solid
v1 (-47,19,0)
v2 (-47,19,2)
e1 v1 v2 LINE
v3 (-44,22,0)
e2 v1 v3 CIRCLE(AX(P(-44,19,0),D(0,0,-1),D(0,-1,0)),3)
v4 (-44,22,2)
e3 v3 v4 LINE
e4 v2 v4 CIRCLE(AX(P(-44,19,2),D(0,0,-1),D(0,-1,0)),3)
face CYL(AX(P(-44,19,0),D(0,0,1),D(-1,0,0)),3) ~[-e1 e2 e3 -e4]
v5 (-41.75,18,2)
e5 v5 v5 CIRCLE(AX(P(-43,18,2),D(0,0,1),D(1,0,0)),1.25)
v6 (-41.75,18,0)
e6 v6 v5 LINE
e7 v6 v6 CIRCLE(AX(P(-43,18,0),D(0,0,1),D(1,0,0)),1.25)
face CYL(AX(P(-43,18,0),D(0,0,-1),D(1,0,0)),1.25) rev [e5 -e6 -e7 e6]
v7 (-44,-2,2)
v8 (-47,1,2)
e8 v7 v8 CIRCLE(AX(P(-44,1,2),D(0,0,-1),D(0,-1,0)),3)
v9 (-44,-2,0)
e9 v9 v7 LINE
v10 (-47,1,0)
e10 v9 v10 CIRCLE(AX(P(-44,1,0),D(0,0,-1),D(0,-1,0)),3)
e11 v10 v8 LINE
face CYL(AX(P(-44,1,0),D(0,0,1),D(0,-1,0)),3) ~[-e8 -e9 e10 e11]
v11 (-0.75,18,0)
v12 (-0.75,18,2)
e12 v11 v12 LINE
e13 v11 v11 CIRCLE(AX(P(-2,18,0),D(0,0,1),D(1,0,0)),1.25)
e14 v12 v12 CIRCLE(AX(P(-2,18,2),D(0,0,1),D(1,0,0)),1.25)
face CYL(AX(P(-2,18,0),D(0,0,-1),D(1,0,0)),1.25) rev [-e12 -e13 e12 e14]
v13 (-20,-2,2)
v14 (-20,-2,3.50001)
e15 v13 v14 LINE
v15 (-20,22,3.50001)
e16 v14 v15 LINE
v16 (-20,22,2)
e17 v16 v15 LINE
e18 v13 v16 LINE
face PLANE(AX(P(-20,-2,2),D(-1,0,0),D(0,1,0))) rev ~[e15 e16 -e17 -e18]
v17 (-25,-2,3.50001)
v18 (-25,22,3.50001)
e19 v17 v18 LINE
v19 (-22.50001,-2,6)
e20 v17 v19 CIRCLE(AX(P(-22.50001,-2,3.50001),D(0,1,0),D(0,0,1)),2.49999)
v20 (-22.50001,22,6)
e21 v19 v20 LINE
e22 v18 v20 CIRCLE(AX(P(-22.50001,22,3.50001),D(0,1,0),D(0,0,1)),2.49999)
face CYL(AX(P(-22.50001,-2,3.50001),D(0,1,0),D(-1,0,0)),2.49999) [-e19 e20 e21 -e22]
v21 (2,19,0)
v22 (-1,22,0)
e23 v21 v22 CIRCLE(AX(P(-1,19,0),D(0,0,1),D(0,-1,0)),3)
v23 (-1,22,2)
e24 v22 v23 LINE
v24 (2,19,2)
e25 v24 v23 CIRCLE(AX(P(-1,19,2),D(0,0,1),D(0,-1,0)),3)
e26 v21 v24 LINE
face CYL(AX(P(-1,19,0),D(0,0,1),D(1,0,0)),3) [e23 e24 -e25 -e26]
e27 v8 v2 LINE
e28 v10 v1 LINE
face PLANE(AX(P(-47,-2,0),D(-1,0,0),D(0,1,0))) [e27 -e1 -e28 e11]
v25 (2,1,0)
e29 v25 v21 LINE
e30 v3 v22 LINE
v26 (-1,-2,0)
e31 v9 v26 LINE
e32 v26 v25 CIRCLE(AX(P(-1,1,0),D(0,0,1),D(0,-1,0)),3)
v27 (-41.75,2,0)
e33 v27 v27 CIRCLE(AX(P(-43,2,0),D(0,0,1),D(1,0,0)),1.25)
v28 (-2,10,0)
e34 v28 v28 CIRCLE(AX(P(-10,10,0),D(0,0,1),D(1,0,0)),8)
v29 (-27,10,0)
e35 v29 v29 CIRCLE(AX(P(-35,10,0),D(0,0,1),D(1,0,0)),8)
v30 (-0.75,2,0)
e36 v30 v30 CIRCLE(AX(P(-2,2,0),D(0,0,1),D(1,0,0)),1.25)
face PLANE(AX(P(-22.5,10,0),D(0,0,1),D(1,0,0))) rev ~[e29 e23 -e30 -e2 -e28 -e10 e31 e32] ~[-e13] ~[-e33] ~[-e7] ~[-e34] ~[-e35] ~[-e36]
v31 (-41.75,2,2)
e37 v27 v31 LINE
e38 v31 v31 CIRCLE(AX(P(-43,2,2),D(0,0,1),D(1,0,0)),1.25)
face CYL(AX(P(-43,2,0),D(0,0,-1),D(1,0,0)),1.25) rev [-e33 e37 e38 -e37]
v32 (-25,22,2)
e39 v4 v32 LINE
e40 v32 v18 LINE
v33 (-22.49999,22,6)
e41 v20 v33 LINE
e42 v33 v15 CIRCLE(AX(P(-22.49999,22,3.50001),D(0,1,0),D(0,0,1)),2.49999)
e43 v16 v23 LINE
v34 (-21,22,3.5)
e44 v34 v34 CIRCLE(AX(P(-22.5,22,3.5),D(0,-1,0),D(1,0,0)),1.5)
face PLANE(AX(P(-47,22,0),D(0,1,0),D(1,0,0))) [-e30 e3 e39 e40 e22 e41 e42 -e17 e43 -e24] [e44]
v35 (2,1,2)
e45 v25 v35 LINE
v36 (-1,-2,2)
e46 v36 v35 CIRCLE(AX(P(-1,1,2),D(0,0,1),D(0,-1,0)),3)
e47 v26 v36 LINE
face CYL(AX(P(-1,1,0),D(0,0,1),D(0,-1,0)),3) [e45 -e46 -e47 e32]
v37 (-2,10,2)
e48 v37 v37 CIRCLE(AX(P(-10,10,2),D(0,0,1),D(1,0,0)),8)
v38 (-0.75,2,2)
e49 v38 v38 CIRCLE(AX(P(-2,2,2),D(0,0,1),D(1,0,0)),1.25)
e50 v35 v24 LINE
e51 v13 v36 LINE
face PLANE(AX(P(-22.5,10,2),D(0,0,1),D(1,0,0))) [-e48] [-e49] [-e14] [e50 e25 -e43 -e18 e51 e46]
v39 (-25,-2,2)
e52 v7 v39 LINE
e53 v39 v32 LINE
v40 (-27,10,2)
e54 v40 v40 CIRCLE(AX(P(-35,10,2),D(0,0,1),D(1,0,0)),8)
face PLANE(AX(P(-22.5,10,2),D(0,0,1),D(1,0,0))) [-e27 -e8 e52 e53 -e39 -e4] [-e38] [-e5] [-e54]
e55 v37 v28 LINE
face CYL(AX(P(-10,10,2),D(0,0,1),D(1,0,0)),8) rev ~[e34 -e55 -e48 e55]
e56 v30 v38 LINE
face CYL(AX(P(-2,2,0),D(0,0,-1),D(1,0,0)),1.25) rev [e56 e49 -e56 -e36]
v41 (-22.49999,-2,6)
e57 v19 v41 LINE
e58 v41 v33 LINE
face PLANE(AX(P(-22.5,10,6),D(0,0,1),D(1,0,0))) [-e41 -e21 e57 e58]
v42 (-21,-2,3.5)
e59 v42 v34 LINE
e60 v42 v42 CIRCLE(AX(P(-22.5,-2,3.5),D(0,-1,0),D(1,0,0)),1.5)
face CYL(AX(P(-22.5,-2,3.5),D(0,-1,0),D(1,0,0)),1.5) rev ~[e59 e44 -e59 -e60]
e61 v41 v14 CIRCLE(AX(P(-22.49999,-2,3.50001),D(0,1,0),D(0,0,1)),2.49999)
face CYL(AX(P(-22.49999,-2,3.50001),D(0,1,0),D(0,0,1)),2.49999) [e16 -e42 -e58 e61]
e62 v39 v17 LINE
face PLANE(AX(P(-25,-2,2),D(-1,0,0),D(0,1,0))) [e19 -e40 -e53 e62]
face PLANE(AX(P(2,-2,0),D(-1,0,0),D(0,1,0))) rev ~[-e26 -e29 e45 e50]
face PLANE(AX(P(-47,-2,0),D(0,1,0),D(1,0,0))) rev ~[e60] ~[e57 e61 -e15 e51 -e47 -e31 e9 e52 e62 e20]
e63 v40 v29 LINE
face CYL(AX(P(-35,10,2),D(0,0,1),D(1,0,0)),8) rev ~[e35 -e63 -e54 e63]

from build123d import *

# Parameters (mm, degrees)
F1_W      = 49
F1_H      = 24
F1_R      = 1.25
F2_DEPTH  = 2
F3_W      = 5
F3_H      = 24
F4_DEPTH  = 4
F5_R      = 1.5
F6_DEPTH  = 24
F7_R      = 2.49999
F8_R      = 3
F9_R      = 8
F10_DEPTH = 2


# Not quite as in the source:
# - a fillet or chamfer is up to 0.001 mm smaller than in the source, because OpenCascade refuses the exact size


with BuildPart() as f2:
    # F1 (on Top) → F2 (new body)
    with BuildSketch(Plane.XY):
        with Locations((-22.5, 10)):
            Rectangle(F1_W, F1_H)
        with Locations((-43, 2)):
            Circle(F1_R, mode=Mode.SUBTRACT)
        with Locations((-2, 2)):
            Circle(F1_R, mode=Mode.SUBTRACT)
        with Locations((-43, 18)):
            Circle(F1_R, mode=Mode.SUBTRACT)
        with Locations((-2, 18)):
            Circle(F1_R, mode=Mode.SUBTRACT)
    extrude(amount=F2_DEPTH)

    # F3 (on face) → F4 (join)
    with BuildSketch(Plane.XY.offset(2)):
        with Locations((-22.5, 10)):
            Rectangle(F3_W, F3_H)
    extrude(amount=F4_DEPTH)

    # F5 (on face) → F6 (cut, through all)
    with BuildSketch(Plane.XZ.offset(2)):
        with Locations((-22.5, 3.5)):
            Circle(F5_R)
    extrude(amount=-F6_DEPTH, mode=Mode.SUBTRACT)

    # F7 (radius 2.5 in the source; OpenCascade refuses exactly that, so slightly less here)
    f7_edges = [f2.edges().sort_by_distance(p)[0] for p in [
        (-20, 10, 6),
        (-25, 10, 6),
    ]]
    fillet(f7_edges, radius=F7_R)

    # F8
    f8_edges = [f2.edges().sort_by_distance(p)[0] for p in [
        (2, -2, 1),
        (2, 22, 1),
        (-47, 22, 1),
        (-47, -2, 1),
    ]]
    fillet(f8_edges, radius=F8_R)

    # F9 (on face) → F10 (cut, through all)
    with BuildSketch(Plane.XY.offset(2)):
        with Locations((-35, 10)):
            Circle(F9_R)
        with Locations((-10, 10)):
            Circle(F9_R)
    extrude(amount=-F10_DEPTH, mode=Mode.SUBTRACT)


solid = f2.part
